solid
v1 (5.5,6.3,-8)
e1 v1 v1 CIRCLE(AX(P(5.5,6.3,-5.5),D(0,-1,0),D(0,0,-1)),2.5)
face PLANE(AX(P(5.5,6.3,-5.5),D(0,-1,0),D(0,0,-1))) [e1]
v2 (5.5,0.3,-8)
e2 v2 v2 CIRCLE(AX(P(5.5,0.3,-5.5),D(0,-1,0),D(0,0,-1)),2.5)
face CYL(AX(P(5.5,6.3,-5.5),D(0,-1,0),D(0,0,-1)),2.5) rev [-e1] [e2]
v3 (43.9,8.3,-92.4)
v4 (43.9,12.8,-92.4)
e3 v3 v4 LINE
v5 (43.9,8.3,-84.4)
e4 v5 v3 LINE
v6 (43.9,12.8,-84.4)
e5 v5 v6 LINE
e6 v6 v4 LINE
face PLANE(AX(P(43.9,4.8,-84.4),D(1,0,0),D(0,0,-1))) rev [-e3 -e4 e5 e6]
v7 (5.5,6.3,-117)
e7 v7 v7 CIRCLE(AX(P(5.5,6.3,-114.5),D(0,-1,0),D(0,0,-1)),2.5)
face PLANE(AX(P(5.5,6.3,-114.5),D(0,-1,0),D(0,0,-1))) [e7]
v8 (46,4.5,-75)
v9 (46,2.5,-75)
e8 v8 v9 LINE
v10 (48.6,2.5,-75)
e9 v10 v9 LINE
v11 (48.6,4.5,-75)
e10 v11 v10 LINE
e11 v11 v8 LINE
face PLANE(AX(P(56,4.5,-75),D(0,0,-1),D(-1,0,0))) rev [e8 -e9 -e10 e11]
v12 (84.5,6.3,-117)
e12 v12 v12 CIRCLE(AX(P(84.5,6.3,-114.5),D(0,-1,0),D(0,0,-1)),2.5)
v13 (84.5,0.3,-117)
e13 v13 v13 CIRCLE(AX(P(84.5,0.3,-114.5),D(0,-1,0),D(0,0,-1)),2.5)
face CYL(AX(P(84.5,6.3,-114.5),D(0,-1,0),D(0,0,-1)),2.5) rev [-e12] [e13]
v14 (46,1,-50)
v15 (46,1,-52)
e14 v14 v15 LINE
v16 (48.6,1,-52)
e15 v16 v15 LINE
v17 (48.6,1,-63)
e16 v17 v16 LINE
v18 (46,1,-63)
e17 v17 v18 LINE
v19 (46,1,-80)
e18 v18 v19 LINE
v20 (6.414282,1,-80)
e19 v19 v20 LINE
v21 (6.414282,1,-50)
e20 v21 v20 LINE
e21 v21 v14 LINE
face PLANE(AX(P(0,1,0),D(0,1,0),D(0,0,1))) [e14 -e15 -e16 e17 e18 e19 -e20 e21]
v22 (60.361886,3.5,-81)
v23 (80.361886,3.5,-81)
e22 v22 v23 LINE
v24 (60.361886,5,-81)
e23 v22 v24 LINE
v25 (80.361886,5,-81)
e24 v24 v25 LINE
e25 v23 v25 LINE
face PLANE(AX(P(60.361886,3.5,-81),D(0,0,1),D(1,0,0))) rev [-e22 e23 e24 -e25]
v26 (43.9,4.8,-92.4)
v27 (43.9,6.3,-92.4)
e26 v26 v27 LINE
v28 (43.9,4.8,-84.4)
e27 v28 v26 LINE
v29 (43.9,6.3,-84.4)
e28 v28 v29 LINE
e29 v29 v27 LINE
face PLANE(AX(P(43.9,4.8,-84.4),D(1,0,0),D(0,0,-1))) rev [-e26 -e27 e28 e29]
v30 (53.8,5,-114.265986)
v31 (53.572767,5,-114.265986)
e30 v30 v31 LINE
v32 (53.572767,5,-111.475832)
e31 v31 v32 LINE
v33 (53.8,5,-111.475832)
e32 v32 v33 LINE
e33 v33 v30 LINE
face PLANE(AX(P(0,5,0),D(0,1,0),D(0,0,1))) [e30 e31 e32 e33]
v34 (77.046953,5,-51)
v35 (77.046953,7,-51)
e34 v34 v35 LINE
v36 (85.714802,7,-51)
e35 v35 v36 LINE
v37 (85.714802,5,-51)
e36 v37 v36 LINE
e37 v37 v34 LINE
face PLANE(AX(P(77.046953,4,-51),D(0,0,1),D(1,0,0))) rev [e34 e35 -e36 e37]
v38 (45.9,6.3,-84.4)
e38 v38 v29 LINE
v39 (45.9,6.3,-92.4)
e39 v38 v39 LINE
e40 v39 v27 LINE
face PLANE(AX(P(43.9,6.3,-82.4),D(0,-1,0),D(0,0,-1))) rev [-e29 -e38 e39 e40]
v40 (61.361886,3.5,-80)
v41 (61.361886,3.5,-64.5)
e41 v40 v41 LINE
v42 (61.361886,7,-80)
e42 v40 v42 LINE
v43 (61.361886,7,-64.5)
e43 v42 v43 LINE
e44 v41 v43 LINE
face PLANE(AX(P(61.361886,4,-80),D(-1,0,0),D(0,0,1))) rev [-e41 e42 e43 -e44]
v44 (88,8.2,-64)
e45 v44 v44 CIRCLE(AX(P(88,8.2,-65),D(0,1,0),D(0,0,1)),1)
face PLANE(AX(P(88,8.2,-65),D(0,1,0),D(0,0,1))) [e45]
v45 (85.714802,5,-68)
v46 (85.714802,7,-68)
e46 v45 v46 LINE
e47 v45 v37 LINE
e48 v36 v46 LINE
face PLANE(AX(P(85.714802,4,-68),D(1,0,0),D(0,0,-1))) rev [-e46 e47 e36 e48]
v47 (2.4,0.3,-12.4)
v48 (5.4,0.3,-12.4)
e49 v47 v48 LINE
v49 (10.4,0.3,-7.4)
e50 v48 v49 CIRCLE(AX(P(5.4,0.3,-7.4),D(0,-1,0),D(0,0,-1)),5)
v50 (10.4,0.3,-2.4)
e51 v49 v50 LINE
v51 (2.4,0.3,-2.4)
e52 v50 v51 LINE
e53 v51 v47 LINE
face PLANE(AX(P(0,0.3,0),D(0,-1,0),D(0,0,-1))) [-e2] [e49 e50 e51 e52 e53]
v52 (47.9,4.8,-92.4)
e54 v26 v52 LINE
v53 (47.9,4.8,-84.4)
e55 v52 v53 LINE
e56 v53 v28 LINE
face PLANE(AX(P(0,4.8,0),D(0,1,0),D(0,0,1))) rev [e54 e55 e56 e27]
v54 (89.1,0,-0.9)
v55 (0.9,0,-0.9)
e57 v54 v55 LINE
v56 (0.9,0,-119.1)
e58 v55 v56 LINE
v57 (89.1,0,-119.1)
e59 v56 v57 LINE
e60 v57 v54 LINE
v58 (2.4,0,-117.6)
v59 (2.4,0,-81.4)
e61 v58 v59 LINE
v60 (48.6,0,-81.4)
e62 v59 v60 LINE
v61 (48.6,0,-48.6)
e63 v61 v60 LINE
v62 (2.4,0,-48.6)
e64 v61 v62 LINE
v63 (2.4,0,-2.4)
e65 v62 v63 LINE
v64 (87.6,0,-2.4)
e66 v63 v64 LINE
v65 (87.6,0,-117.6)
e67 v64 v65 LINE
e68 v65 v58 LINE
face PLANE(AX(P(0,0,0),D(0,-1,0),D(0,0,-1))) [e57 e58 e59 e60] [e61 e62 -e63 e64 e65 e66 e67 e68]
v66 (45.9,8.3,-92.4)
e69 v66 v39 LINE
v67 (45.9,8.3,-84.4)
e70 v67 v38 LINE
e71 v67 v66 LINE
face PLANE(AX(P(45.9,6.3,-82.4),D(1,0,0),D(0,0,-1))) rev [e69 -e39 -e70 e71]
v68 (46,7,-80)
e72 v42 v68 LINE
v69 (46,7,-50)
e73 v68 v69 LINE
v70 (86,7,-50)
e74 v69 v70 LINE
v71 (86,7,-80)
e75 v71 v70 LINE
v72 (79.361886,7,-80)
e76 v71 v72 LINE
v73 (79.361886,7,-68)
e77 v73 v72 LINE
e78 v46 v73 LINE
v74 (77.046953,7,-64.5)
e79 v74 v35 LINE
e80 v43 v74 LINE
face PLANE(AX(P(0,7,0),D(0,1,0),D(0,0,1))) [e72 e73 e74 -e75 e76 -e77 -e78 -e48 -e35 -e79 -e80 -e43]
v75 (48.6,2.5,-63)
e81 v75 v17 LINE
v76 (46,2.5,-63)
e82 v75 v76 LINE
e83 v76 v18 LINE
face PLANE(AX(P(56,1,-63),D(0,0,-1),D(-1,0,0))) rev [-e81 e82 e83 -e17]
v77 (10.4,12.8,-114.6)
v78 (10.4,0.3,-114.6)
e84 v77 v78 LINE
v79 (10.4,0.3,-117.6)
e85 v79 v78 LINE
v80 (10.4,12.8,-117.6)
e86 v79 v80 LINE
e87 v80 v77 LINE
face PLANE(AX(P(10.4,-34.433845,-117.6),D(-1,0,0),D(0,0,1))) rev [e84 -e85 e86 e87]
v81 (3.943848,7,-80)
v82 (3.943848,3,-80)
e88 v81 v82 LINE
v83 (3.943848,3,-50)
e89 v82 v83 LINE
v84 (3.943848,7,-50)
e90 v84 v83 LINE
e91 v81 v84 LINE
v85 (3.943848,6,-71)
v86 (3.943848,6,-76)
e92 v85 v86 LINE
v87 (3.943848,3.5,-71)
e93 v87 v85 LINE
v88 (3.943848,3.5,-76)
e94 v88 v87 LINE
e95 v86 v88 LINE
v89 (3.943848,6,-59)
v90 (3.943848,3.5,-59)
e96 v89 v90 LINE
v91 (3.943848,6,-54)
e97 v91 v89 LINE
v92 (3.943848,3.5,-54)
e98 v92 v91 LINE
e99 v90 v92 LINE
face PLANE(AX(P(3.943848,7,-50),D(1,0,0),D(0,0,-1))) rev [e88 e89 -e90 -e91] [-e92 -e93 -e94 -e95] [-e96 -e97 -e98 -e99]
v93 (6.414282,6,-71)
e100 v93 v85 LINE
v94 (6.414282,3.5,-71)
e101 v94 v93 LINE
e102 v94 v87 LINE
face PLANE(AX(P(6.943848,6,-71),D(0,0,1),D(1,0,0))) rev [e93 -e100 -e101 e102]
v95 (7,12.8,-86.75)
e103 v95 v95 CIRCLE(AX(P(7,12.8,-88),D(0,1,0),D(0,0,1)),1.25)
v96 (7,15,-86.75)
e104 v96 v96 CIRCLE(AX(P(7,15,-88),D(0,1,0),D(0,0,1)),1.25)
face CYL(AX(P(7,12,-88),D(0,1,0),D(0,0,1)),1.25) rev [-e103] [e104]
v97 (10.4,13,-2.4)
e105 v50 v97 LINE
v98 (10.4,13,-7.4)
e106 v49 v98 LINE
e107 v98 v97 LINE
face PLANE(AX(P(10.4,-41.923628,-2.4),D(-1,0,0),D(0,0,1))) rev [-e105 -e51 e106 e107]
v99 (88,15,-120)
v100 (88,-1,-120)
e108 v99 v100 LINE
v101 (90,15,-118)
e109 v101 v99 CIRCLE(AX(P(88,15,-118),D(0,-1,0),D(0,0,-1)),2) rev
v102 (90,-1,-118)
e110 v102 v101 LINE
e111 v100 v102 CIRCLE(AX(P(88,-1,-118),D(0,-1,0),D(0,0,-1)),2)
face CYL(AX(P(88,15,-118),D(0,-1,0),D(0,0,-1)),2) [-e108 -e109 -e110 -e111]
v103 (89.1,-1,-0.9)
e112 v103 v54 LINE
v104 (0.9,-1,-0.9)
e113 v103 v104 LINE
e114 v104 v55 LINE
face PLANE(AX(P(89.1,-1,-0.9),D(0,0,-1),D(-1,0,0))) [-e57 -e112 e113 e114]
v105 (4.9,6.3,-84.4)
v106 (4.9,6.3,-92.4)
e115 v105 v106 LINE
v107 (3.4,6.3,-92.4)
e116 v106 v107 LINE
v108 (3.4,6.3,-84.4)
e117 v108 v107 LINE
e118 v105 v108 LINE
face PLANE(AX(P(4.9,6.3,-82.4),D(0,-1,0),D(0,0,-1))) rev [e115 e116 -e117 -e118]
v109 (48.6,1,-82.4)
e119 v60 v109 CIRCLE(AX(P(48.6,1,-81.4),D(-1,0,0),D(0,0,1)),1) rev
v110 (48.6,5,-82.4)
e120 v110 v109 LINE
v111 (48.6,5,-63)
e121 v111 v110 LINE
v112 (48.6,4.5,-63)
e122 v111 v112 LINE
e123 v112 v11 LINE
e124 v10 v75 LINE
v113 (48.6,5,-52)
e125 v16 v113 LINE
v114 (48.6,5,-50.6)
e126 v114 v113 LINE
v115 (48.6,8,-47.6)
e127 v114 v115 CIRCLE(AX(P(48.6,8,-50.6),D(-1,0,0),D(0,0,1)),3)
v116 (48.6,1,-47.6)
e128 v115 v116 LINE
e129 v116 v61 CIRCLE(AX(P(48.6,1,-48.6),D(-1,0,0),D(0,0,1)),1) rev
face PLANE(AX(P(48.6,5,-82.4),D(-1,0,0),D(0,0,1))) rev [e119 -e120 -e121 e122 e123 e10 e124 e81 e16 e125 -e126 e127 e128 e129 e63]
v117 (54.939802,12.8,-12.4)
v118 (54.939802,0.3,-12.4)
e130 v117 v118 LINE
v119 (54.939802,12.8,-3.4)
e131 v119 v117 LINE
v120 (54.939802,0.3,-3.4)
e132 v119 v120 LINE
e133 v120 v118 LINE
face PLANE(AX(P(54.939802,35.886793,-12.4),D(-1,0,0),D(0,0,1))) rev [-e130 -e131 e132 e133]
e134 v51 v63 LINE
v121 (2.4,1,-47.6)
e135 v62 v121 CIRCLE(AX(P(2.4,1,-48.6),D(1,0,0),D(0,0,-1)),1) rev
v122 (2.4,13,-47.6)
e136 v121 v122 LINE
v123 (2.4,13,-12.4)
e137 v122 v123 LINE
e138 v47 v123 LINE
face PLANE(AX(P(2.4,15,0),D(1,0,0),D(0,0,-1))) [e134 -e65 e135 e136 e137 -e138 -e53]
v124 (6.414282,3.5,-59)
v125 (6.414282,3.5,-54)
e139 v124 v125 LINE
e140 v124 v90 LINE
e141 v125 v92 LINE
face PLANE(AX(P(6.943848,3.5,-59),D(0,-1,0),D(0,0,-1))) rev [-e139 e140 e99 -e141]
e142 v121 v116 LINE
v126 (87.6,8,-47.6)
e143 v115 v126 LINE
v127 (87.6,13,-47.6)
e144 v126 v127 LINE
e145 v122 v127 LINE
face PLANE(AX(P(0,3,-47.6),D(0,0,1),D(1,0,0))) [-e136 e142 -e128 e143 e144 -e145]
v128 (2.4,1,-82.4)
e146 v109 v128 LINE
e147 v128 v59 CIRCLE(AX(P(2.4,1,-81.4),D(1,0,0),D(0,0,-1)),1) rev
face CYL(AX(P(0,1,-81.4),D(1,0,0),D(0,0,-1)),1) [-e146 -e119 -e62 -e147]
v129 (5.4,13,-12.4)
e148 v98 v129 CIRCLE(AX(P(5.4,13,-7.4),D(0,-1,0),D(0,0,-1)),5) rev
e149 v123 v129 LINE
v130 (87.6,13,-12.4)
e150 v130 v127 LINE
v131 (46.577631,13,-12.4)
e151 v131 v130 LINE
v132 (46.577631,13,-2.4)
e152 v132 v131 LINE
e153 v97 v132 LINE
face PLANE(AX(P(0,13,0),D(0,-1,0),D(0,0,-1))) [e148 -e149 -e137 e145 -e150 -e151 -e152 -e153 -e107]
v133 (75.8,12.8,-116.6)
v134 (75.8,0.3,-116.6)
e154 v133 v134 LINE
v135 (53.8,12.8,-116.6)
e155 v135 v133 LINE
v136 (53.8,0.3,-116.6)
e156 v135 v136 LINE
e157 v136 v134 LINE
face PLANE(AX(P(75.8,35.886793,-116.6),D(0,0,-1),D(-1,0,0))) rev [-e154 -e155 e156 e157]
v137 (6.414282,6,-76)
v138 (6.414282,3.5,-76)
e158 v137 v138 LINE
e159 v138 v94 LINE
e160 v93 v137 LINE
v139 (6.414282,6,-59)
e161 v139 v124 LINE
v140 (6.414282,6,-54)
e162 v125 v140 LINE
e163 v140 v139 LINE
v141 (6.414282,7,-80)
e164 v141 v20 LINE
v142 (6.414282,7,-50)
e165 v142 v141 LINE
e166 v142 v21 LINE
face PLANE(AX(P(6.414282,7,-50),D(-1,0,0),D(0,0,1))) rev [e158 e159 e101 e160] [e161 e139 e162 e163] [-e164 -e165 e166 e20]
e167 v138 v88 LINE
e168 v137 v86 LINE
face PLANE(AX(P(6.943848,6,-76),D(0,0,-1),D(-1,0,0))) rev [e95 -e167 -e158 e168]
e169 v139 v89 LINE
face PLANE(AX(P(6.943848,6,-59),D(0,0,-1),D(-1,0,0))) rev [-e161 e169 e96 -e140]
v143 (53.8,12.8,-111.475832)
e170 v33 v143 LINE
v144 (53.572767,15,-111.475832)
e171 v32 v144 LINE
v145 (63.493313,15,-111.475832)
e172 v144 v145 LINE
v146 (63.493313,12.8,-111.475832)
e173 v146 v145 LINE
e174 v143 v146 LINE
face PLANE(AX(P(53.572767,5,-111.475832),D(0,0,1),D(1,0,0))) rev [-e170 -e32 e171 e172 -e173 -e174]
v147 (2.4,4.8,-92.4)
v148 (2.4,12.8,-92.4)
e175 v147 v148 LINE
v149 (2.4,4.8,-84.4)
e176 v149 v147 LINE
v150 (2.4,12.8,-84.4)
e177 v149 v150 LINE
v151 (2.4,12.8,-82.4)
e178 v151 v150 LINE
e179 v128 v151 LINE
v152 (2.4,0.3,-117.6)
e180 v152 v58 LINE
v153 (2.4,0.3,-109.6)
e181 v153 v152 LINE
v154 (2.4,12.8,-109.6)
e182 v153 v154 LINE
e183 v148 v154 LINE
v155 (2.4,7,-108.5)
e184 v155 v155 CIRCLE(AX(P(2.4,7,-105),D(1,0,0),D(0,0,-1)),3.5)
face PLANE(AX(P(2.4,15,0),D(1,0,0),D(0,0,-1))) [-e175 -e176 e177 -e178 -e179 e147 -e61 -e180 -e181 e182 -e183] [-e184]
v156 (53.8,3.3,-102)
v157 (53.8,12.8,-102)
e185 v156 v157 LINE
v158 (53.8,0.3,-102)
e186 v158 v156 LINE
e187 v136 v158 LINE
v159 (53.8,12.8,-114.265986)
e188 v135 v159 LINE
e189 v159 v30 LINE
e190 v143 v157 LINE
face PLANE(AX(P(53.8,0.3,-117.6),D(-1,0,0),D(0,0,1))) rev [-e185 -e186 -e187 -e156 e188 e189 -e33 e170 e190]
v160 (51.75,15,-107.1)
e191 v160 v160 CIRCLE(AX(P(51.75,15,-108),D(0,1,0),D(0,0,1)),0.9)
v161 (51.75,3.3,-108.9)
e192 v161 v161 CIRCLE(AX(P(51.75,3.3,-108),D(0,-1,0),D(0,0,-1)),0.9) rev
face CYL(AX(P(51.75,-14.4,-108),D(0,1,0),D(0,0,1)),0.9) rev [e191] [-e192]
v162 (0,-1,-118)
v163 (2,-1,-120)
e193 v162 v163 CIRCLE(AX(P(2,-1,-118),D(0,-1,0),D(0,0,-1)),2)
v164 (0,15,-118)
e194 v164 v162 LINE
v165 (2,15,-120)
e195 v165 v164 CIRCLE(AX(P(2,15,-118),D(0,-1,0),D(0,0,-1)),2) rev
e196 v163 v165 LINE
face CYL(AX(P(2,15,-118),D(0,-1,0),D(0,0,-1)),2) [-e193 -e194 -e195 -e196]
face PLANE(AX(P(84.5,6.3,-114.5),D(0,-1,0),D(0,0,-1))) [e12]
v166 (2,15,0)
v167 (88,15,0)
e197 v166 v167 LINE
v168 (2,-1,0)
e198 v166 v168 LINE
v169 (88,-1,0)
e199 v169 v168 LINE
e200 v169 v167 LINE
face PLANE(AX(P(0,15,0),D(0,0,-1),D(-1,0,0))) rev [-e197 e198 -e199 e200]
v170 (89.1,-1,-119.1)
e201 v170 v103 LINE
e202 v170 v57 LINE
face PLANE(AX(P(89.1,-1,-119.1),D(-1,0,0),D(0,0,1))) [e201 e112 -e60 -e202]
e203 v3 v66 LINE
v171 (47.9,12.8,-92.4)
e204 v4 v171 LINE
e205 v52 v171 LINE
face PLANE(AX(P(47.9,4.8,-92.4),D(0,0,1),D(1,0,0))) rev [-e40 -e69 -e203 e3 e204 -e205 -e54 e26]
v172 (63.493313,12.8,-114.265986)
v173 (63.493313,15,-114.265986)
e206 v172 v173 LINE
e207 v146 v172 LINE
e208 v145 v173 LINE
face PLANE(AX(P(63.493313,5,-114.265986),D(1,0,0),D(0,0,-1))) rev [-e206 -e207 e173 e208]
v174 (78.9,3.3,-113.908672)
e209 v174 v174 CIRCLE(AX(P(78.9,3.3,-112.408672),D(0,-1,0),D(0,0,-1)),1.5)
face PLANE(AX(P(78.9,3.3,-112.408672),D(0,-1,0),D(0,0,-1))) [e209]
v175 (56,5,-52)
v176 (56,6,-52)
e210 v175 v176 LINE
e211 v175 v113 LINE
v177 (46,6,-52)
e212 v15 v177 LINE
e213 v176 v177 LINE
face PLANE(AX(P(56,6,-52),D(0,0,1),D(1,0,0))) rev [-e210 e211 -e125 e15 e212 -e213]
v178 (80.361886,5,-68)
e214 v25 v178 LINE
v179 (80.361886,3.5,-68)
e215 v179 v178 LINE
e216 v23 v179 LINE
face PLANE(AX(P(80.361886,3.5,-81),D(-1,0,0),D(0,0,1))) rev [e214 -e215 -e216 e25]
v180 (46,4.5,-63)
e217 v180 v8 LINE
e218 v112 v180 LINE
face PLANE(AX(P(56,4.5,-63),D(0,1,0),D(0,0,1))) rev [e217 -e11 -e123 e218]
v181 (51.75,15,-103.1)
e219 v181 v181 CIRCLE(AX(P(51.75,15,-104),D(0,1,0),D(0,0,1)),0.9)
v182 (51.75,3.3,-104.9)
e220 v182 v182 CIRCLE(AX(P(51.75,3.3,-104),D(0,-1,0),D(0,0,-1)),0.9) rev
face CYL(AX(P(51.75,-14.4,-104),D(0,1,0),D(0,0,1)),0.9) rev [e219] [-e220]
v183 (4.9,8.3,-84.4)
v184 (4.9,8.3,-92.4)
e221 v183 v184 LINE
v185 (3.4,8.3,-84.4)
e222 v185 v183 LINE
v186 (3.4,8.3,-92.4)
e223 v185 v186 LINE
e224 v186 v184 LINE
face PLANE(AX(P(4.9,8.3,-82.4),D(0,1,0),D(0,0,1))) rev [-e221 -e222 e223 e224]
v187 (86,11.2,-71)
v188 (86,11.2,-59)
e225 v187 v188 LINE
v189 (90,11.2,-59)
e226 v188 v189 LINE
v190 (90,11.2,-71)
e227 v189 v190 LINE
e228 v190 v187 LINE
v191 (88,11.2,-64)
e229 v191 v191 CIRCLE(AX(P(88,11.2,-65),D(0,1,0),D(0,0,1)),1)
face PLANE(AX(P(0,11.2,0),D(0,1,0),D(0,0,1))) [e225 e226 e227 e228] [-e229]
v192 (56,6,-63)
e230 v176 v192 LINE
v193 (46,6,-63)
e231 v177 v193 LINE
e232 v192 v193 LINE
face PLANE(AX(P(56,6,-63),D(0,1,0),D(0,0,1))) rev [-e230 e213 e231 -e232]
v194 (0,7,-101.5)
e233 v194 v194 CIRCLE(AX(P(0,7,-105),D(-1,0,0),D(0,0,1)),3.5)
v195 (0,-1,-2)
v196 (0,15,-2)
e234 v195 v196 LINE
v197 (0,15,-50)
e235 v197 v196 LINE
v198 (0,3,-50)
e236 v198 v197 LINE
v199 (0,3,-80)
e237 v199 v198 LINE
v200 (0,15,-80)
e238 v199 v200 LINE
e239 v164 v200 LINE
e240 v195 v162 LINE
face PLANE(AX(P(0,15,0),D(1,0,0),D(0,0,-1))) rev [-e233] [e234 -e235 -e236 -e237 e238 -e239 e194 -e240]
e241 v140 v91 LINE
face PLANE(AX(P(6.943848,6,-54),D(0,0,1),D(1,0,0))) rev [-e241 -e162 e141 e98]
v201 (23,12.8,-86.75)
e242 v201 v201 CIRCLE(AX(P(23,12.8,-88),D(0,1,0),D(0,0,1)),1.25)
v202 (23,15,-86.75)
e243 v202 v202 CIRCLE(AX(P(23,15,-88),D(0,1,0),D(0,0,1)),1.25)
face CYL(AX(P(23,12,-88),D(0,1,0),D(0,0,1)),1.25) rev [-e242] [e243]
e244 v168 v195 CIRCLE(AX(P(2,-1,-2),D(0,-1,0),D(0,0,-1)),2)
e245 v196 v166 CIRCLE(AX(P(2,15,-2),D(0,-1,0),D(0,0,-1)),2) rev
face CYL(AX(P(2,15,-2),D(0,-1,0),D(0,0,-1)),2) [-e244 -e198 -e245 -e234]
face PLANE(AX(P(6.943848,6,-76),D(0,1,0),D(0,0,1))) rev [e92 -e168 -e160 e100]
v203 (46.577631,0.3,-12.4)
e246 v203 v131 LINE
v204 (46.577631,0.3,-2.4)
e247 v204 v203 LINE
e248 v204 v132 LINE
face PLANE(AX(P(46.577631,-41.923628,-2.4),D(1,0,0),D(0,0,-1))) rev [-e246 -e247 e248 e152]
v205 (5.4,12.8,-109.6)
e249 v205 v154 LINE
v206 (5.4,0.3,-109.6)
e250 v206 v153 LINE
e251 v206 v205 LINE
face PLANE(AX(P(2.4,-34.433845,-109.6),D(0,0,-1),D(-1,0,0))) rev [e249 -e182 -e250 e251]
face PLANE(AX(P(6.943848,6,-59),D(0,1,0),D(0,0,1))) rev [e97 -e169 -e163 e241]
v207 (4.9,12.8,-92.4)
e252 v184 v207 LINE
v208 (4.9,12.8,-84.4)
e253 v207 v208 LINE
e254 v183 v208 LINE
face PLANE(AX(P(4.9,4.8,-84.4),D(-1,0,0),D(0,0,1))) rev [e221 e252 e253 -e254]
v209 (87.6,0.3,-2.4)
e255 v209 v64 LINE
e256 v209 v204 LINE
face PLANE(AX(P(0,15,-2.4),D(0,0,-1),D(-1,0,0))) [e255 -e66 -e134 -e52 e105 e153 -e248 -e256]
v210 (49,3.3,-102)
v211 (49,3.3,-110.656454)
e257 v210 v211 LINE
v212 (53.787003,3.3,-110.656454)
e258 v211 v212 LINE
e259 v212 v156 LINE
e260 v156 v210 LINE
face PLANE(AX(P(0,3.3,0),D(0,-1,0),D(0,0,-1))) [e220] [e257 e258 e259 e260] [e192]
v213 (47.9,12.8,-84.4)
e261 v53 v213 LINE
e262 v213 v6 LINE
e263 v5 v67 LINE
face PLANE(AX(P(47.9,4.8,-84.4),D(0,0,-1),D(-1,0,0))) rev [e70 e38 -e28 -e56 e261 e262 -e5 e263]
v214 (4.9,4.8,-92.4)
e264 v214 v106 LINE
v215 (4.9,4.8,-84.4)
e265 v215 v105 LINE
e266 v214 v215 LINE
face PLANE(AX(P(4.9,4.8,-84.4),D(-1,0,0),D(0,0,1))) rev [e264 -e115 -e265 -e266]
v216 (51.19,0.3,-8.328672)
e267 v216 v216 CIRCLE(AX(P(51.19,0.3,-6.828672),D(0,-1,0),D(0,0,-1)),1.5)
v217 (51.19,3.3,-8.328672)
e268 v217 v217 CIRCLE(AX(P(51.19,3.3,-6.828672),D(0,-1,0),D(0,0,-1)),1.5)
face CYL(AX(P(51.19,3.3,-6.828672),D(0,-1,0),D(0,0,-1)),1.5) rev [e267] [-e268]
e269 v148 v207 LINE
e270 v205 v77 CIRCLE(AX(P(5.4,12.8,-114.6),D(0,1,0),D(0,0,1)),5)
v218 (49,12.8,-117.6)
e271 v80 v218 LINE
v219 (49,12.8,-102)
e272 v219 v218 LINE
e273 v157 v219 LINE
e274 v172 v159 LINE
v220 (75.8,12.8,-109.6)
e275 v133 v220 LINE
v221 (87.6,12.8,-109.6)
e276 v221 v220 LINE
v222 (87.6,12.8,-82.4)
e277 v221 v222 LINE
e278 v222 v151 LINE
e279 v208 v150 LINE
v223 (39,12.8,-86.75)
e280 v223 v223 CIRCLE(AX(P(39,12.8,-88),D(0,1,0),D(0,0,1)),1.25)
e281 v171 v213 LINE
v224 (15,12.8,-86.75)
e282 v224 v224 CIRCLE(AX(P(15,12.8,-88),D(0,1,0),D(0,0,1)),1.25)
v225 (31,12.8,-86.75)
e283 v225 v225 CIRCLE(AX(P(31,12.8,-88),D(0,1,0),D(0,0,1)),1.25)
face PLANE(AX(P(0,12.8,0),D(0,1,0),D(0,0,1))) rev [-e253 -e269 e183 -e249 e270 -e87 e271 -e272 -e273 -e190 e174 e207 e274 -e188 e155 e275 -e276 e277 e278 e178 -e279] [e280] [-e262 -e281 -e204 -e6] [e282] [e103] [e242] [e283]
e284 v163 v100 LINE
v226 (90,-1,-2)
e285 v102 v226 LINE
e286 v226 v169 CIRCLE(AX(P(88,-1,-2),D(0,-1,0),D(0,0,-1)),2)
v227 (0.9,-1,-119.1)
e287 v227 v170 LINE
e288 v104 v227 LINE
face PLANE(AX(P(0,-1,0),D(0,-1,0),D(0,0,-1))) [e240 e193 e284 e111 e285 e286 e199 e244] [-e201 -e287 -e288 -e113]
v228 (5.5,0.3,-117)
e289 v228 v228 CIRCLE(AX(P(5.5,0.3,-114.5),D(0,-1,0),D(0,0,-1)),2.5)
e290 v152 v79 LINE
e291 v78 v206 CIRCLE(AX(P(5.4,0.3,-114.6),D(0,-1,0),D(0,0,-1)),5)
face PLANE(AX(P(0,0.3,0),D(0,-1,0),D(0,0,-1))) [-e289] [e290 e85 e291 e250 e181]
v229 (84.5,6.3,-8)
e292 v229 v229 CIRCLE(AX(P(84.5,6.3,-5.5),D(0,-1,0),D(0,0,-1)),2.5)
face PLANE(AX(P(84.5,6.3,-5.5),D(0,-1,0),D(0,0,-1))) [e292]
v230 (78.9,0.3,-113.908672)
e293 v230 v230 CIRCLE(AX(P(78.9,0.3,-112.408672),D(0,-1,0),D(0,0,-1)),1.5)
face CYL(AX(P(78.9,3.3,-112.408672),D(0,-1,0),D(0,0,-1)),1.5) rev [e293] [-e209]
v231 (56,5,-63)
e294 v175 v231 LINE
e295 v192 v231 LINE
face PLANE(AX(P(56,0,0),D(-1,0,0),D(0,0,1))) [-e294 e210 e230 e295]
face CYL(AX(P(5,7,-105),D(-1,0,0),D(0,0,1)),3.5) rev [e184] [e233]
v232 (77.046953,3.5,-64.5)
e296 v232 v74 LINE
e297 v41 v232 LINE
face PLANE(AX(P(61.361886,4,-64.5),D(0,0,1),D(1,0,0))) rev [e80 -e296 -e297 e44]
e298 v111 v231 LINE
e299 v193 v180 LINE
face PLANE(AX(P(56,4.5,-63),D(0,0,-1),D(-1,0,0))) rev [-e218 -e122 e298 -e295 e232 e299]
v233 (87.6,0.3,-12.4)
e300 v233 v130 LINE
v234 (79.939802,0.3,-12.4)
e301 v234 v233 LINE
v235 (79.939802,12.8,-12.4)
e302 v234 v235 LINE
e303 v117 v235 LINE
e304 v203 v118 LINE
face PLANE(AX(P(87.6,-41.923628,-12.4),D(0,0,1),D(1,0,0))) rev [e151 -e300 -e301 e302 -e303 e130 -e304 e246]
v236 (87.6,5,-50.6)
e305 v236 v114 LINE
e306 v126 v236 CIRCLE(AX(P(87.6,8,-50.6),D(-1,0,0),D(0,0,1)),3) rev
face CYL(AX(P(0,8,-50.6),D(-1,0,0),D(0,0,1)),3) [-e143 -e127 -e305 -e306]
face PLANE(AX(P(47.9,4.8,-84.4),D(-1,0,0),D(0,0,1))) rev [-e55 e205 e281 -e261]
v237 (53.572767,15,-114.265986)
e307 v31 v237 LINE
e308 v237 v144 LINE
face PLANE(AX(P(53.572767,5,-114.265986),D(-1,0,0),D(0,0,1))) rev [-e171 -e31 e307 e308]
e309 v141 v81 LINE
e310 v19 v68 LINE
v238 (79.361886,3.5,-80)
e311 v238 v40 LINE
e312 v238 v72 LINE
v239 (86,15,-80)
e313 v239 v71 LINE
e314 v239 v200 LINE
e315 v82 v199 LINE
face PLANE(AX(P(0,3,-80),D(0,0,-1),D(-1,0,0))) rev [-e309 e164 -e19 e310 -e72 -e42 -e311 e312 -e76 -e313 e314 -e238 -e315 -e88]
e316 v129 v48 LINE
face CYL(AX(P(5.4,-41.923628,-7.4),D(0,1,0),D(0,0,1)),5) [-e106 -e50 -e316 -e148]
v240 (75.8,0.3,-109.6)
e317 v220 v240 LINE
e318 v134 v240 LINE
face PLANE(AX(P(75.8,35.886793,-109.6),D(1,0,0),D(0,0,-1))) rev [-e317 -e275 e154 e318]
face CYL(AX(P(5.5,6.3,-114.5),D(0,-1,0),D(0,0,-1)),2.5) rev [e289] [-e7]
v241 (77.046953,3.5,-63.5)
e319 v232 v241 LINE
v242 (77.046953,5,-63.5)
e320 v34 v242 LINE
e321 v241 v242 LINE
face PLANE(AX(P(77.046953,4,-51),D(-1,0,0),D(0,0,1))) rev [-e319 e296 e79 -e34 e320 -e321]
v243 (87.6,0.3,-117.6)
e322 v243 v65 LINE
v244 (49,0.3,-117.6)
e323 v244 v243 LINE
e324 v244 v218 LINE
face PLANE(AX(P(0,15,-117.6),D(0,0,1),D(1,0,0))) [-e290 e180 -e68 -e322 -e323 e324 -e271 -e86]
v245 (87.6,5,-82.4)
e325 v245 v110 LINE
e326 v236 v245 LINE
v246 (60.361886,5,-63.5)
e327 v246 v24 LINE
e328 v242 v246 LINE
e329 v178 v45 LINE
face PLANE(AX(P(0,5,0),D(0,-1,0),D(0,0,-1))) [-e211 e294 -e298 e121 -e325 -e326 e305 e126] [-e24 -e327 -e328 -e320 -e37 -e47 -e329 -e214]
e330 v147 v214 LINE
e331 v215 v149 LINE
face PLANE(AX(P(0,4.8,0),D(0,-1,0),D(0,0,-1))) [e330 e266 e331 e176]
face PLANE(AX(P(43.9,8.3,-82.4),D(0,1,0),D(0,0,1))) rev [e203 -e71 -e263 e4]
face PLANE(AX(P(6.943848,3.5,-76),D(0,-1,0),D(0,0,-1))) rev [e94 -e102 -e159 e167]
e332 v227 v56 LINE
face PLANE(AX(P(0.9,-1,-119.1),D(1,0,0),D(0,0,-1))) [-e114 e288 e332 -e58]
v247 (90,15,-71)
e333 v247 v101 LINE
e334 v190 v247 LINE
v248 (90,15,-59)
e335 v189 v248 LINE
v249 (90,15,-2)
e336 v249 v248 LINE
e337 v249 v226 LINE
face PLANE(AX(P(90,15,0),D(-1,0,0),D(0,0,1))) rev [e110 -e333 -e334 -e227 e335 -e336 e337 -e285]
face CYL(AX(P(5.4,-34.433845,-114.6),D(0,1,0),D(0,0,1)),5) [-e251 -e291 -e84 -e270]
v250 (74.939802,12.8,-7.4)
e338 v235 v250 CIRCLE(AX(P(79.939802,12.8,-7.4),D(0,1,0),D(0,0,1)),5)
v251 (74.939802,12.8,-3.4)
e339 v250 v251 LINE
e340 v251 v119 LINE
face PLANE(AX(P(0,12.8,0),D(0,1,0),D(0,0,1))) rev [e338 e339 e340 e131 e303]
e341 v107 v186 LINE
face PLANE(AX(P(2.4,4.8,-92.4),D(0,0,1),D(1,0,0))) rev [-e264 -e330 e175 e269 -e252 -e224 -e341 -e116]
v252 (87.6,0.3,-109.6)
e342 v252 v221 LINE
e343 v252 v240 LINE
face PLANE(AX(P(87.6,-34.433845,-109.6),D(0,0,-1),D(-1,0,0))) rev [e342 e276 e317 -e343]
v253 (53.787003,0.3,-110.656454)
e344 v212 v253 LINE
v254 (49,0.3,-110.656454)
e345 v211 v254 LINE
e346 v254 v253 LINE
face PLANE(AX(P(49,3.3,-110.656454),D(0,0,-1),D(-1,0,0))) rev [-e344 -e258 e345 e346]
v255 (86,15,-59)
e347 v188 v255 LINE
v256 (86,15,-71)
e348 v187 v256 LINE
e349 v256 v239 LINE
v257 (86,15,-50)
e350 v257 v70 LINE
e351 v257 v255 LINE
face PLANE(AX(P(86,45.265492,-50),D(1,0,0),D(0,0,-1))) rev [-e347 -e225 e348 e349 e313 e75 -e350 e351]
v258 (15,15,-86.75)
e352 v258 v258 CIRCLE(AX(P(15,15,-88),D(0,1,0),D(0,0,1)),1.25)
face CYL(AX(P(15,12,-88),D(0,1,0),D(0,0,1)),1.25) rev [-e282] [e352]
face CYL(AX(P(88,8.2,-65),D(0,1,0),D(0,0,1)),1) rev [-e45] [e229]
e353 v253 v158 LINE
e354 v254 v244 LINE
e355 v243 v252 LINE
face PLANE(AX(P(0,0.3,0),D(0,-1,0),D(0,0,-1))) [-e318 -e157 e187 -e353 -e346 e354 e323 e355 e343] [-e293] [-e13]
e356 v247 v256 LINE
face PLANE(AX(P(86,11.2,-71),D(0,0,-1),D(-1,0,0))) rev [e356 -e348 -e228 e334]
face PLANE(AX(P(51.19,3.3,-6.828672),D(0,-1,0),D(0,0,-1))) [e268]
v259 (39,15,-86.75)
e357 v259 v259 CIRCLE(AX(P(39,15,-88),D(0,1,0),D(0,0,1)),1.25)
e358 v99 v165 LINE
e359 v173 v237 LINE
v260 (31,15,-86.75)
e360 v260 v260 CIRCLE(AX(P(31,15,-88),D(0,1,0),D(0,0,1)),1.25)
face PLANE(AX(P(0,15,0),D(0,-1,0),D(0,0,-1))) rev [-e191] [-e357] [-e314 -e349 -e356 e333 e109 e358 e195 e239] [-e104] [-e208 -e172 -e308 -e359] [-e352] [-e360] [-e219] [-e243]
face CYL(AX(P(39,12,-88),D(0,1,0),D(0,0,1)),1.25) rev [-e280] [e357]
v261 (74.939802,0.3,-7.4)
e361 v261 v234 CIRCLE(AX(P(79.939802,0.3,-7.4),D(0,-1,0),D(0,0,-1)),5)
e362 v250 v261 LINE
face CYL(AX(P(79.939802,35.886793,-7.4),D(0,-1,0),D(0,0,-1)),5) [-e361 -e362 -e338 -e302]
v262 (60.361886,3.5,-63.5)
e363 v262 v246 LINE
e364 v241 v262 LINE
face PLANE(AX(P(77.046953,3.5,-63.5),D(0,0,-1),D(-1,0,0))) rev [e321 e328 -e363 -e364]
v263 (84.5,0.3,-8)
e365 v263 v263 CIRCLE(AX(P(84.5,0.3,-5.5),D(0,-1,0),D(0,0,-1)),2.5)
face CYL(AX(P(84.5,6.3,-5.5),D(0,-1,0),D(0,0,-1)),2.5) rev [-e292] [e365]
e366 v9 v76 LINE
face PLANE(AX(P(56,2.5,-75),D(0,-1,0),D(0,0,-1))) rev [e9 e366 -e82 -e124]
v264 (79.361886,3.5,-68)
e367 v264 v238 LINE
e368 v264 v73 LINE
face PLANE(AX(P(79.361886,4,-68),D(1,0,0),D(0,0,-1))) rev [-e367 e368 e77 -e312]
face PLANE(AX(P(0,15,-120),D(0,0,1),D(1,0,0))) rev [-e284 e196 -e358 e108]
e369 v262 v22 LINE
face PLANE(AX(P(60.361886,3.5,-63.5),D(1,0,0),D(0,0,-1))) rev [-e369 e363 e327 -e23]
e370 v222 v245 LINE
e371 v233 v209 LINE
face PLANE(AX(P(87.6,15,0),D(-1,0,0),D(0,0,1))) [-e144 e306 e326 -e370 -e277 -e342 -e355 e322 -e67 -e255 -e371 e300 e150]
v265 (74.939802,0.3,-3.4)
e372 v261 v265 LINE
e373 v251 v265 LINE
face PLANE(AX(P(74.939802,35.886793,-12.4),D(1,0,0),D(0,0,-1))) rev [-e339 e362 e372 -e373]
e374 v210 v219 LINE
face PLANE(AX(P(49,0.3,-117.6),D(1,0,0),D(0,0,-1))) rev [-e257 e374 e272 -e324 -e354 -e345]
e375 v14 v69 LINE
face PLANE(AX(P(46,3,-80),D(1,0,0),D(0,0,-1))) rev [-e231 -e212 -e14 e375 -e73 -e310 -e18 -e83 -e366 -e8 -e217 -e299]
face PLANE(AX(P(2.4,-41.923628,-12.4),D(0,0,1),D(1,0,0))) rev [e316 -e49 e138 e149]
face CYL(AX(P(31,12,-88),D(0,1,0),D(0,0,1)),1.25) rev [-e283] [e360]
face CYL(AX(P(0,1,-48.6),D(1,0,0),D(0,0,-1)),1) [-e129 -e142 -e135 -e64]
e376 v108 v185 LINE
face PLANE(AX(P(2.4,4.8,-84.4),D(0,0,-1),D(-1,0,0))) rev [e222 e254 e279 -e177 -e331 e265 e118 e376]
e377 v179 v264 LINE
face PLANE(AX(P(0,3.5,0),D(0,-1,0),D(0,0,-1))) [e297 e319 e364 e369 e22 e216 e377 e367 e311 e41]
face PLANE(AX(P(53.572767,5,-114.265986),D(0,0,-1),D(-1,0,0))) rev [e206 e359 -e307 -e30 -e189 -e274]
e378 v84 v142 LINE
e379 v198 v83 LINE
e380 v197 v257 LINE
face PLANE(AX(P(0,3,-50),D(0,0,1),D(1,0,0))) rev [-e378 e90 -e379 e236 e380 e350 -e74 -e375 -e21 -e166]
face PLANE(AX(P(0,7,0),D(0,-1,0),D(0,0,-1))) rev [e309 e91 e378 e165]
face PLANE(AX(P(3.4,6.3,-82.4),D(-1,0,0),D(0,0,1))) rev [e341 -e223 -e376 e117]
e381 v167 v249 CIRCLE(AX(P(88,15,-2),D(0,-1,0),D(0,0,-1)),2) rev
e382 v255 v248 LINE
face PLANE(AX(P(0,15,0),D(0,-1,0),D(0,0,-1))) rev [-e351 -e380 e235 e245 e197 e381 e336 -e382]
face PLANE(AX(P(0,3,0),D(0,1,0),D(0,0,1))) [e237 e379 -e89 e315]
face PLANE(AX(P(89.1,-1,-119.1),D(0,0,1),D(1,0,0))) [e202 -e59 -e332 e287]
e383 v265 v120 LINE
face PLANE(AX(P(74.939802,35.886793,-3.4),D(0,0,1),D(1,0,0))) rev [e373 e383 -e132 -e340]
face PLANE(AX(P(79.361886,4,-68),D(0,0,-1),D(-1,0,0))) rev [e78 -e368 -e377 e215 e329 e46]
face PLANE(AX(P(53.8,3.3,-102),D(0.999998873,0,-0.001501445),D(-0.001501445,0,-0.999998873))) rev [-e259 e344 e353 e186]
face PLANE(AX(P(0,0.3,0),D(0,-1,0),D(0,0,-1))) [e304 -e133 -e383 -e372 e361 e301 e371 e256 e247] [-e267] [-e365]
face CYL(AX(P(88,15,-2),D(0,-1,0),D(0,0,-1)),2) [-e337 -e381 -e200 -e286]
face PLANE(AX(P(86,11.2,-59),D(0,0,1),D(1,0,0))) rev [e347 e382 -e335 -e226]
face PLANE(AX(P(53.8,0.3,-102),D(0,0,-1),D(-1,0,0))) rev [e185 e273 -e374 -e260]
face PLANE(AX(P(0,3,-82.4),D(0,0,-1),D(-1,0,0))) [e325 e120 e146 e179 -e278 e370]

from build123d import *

# Parameters (mm, degrees)
SKETCH1_W            = 90
SKETCH1_H            = 120
BOSS_EXTRUDE1_DEPTH  = 15
SKETCH2_W            = 46
SKETCH2_H            = 30
CUT_EXTRUDE1_DEPTH   = 12
SKETCH3_W            = 44
SKETCH3_H            = 30
CUT_EXTRUDE2_DEPTH   = 8
SHELL1_START         = -47.6
SHELL1_OUTLINE_W     = 85.2
SHELL1_OUTLINE_H     = 13
SHELL1_DEPTH         = 45.2
SHELL1_START_2       = -117.6
SHELL1_2_OUTLINE_W   = 85.2
SHELL1_2_OUTLINE_H   = 5
SHELL1_2_DEPTH       = 35.2
SKETCH7_W            = 39
SKETCH7_H            = 34.8
CUT_EXTRUDE6_DEPTH   = 5
SKETCH11_W           = 42.056152249
SKETCH11_H           = 30
CUT_EXTRUDE9_DEPTH   = 2
CUT_EXTRUDE7_DEPTH   = 10
CUT_EXTRUDE10_DEPTH  = 3
SKETCH14_W           = 90
SKETCH14_H           = 120
SKETCH14_W_2         = 88.2
SKETCH14_H_2         = 118.2
BOSS_EXTRUDE2_DEPTH  = 1
SKETCH22_W           = 4
SKETCH22_H           = 30
BOSS_EXTRUDE6_DEPTH  = 8
SKETCH26_W           = 4
SKETCH26_H           = 12
CUT_EXTRUDE20_DEPTH  = 3.8
SKETCH27_R           = 1
CUT_EXTRUDE21_DEPTH  = 3
BOSS_EXTRUDE9_DEPTH  = 1.5
SKETCH40_R           = 3.5
CUT_EXTRUDE24_DEPTH  = 5
FILLET1_R            = 3
SKETCH44_W           = 85.2
SKETCH44_H           = 35.2
CUT_EXTRUDE25_DEPTH  = 7.8
SKETCH46_W           = 4.8
SKETCH46_H           = 15.6
BOSS_EXTRUDE15_DEPTH = 12.5
SKETCH6_R            = 0.9
CUT_EXTRUDE26_DEPTH  = 29.4
SKETCH47_W           = 33.8
SKETCH47_H           = 8
SKETCH47_W_2         = 8
BOSS_EXTRUDE16_DEPTH = 12.5
SKETCH49_W           = 41.022368698
SKETCH49_H           = 10
SKETCH49_W_2         = 8
BOSS_EXTRUDE17_DEPTH = 12.7
SKETCH50_W           = 22
SKETCH50_H           = 7
SKETCH50_W_2         = 20
SKETCH50_H_2         = 9
CUT_EXTRUDE28_DEPTH  = 12.5
FILLET3_R            = 5
FILLET4_R            = 2
SKETCH51_R           = 2.5
CUT_EXTRUDE29_DEPTH  = 6
CUT_EXTRUDE30_DEPTH  = 3
SKETCH52_R           = 1.5
CUT_EXTRUDE31_DEPTH  = 3
SKETCH54_W           = 2.470433815
SKETCH54_H           = 30
BOSS_EXTRUDE18_DEPTH = 6
SKETCH55_W           = 5
SKETCH55_H           = 2.5
CUT_EXTRUDE32_DEPTH  = 3
FILLET5_R            = 1
SKETCH56_R           = 1.25
CUT_EXTRUDE33_DEPTH  = 3
SKETCH57_W           = 2.5
SKETCH57_H           = 8
SKETCH57_W_2         = 4
BOSS_EXTRUDE19_DEPTH = 8
SKETCH58_W           = 1.5
SKETCH58_H           = 2
SKETCH58_W_2         = 2
CUT_EXTRUDE34_DEPTH  = 10
SKETCH59_W           = 9.920545957
SKETCH59_H           = 2.790153551
CUT_EXTRUDE35_DEPTH  = 10


# Read off the part's stored shape, not the designer's step: Shell1
with BuildPart() as part:
    # Sketch1 → Boss-Extrude1 (new body)
    with BuildSketch(Plane(origin=(0, 0, 0), x_dir=(1, 0, 0), z_dir=(0, 1, 0))):
        with Locations((45, 60)):
            Rectangle(SKETCH1_W, SKETCH1_H)
    extrude(amount=BOSS_EXTRUDE1_DEPTH)

    # Sketch2 → Cut-Extrude1 (cut)
    with BuildSketch(Plane(origin=(0, 15, 0), x_dir=(1, 0, 0), z_dir=(0, 1, 0))):
        with Locations((23, 65)):
            Rectangle(SKETCH2_W, SKETCH2_H)
    extrude(amount=-CUT_EXTRUDE1_DEPTH, mode=Mode.SUBTRACT)

    # Sketch3 → Cut-Extrude2 (cut)
    with BuildSketch(Plane(origin=(0, 15, 0), x_dir=(1, 0, 0), z_dir=(0, 1, 0))):
        with Locations((68, 65)):
            Rectangle(SKETCH3_W, SKETCH3_H)
    extrude(amount=-CUT_EXTRUDE2_DEPTH, mode=Mode.SUBTRACT)

    # Shell1 outline → Shell1 (cut)
    with BuildSketch(Plane.XY.offset(SHELL1_START)):
        with Locations((45, 6.5)):
            Rectangle(SHELL1_OUTLINE_W, SHELL1_OUTLINE_H)
    extrude(amount=SHELL1_DEPTH, mode=Mode.SUBTRACT)

    # Shell1 2 outline → Shell1 2 (cut)
    with BuildSketch(Plane.XY.offset(SHELL1_START_2)):
        with Locations((45, 2.5)):
            Rectangle(SHELL1_2_OUTLINE_W, SHELL1_2_OUTLINE_H)
    extrude(amount=SHELL1_2_DEPTH, mode=Mode.SUBTRACT)

    # Sketch7 → Cut-Extrude6 (cut)
    with BuildSketch(Plane.XZ):
        with Locations((68.1, -65)):
            Rectangle(SKETCH7_W, SKETCH7_H)
    extrude(amount=-CUT_EXTRUDE6_DEPTH, mode=Mode.SUBTRACT)

    # Sketch11 → Cut-Extrude9 (cut)
    with BuildSketch(Plane(origin=(0, 3, 0), x_dir=(1, 0, 0), z_dir=(0, 1, 0))):
        with Locations((24.971923875, 65)):
            Rectangle(SKETCH11_W, SKETCH11_H)
    extrude(amount=-CUT_EXTRUDE9_DEPTH, mode=Mode.SUBTRACT)

    # Sketch8 → Cut-Extrude7 (cut)
    with BuildSketch(Plane.ZY.offset(-46)):
        Polygon((-63, 1), (-63, 2.5), (-75, 2.5), (-75, 4.5), (-63, 4.5), (-63, 6), (-52, 6), (-52, 4.5), (-52, 1), align=None)
    extrude(amount=-CUT_EXTRUDE7_DEPTH, mode=Mode.SUBTRACT)

    # Sketch12 → Cut-Extrude10 (cut)
    with BuildSketch(Plane(origin=(0, 7, 0), x_dir=(1, 0, 0), z_dir=(0, 1, 0))):
        Polygon((79.361885724, 68), (79.361885724, 80), (61.361885724, 80), (61.361885724, 64.5), (77.04695331, 64.5), (77.04695331, 51), (85.714801791, 51), (85.714801791, 68), align=None)
    extrude(amount=-CUT_EXTRUDE10_DEPTH, mode=Mode.SUBTRACT)

    # Sketch14 → Boss-Extrude2 (add)
    with BuildSketch(Plane.XZ):
        with Locations((45, -60)):
            Rectangle(SKETCH14_W, SKETCH14_H)
        with Locations((45, -60)):
            Rectangle(SKETCH14_W_2, SKETCH14_H_2, mode=Mode.SUBTRACT)
    extrude(amount=BOSS_EXTRUDE2_DEPTH)

    # Sketch22 → Boss-Extrude6 (add)
    with BuildSketch(Plane(origin=(0, 7, 0), x_dir=(1, 0, 0), z_dir=(0, 1, 0))):
        with Locations((88, 65)):
            Rectangle(SKETCH22_W, SKETCH22_H)
    extrude(amount=BOSS_EXTRUDE6_DEPTH)

    # Sketch26 → Cut-Extrude20 (cut)
    with BuildSketch(Plane(origin=(0, 15, 0), x_dir=(1, 0, 0), z_dir=(0, 1, 0))):
        with Locations((88, 65)):
            Rectangle(SKETCH26_W, SKETCH26_H)
    extrude(amount=-CUT_EXTRUDE20_DEPTH, mode=Mode.SUBTRACT)

    # Sketch27 → Cut-Extrude21 (cut)
    with BuildSketch(Plane(origin=(0, 11.2, 0), x_dir=(1, 0, 0), z_dir=(0, 1, 0))):
        with Locations(Location((88, 65, 0), (0, 0, 270))):
            Circle(SKETCH27_R)
    extrude(amount=-CUT_EXTRUDE21_DEPTH, mode=Mode.SUBTRACT)

    # Sketch36 → Boss-Extrude9 (add)
    with BuildSketch(Plane.XZ.offset(-5)):
        Polygon((77.04695331, -63.5), (60.361885724, -63.5), (60.361885724, -81), (80.361885724, -81), (80.361885724, -68), (79.361885724, -68), (79.361885724, -80), (61.361885724, -80), (61.361885724, -64.5), (77.04695331, -64.5), align=None)
    extrude(amount=BOSS_EXTRUDE9_DEPTH)

    # Sketch40 → Cut-Extrude24 (cut)
    with BuildSketch(Plane.ZY):
        with Locations((-105, 7)):
            Circle(SKETCH40_R)
    extrude(amount=-CUT_EXTRUDE24_DEPTH, mode=Mode.SUBTRACT)

    # Fillet1
    fillet1_edges = [part.edges().sort_by_distance(p)[0] for p in [
        (68.1, 5, -47.6),
    ]]
    fillet(fillet1_edges, radius=FILLET1_R)

    # Sketch44 → Cut-Extrude25 (cut)
    with BuildSketch(Plane.XZ.offset(-5)):
        with Locations((45, -100)):
            Rectangle(SKETCH44_W, SKETCH44_H)
    extrude(amount=-CUT_EXTRUDE25_DEPTH, mode=Mode.SUBTRACT)

    # Sketch46 → Boss-Extrude15 (add)
    with BuildSketch(Plane.XZ.offset(-12.8)):
        with Locations((51.4, -109.8)):
            Rectangle(SKETCH46_W, SKETCH46_H)
    extrude(amount=BOSS_EXTRUDE15_DEPTH)

    # Sketch6 → Cut-Extrude26 (cut)
    with BuildSketch(Plane(origin=(0, 15, 0), x_dir=(1, 0, 0), z_dir=(0, 1, 0))):
        with Locations(Location((51.75, 108, 0), (0, 0, 270))):
            Circle(SKETCH6_R)
        with Locations(Location((51.75, 104, 0), (0, 0, 270))):
            Circle(SKETCH6_R)
    extrude(amount=-CUT_EXTRUDE26_DEPTH, mode=Mode.SUBTRACT)

    # Sketch47 → Boss-Extrude16 (add)
    with BuildSketch(Plane.XZ.offset(-12.8)):
        with Locations((70.7, -113.6)):
            Rectangle(SKETCH47_W, SKETCH47_H)
        with Locations((6.4, -113.6)):
            Rectangle(SKETCH47_W_2, SKETCH47_H)
    extrude(amount=BOSS_EXTRUDE16_DEPTH)

    # Sketch49 → Boss-Extrude17 (add)
    with BuildSketch(Plane.XZ.offset(-13)):
        with Locations((67.088815651, -7.4)):
            Rectangle(SKETCH49_W, SKETCH49_H)
        with Locations((6.4, -7.4)):
            Rectangle(SKETCH49_W_2, SKETCH49_H)
    extrude(amount=BOSS_EXTRUDE17_DEPTH)

    # Sketch50 → Cut-Extrude28 (cut)
    with BuildSketch(Plane.XZ.offset(-0.3)):
        with Locations((64.8, -113.1)):
            Rectangle(SKETCH50_W, SKETCH50_H)
        with Locations((64.939802008, -7.9)):
            Rectangle(SKETCH50_W_2, SKETCH50_H_2)
    extrude(amount=-CUT_EXTRUDE28_DEPTH, mode=Mode.SUBTRACT)

    # Fillet3
    fillet3_edges = [part.edges().sort_by_distance(p)[0] for p in [
        (10.4, 6.55, -109.6),
        (10.4, 6.65, -12.4),
        (74.939802008, 6.55, -12.4),
    ]]
    fillet(fillet3_edges, radius=FILLET3_R)

    # Fillet4
    fillet4_edges = [part.edges().sort_by_distance(p)[0] for p in [
        (0, 7, -120),
        (90, 7, -120),
        (90, 7, 0),
        (0, 7, 0),
    ]]
    fillet(fillet4_edges, radius=FILLET4_R)

    # Sketch51 → Cut-Extrude29 (cut)
    with BuildSketch(Plane.XZ.offset(-0.3)):
        with Locations(Location((84.5, -114.5, 0), (0, 0, 270))):
            Circle(SKETCH51_R)
        with Locations(Location((84.5, -5.5, 0), (0, 0, 270))):
            Circle(SKETCH51_R)
        with Locations(Location((5.5, -5.5, 0), (0, 0, 270))):
            Circle(SKETCH51_R)
        with Locations(Location((5.5, -114.5, 0), (0, 0, 270))):
            Circle(SKETCH51_R)
    extrude(amount=-CUT_EXTRUDE29_DEPTH, mode=Mode.SUBTRACT)

    # Sketch53 → Cut-Extrude30 (cut)
    with BuildSketch(Plane.XZ.offset(-0.3)):
        Polygon((53.8, -102), (49, -102), (49, -110.656453849), (53.787002796, -110.656453849), align=None)
    extrude(amount=-CUT_EXTRUDE30_DEPTH, mode=Mode.SUBTRACT)

    # Sketch52 → Cut-Extrude31 (cut)
    with BuildSketch(Plane.XZ.offset(-0.3)):
        with Locations(Location((51.19, -6.828671793, 0), (0, 0, 270))):
            Circle(SKETCH52_R)
        with Locations(Location((78.9, -112.408671793, 0), (0, 0, 270))):
            Circle(SKETCH52_R)
    extrude(amount=-CUT_EXTRUDE31_DEPTH, mode=Mode.SUBTRACT)

    # Sketch54 → Boss-Extrude18 (add)
    with BuildSketch(Plane(origin=(0, 1, 0), x_dir=(1, 0, 0), z_dir=(0, 1, 0))):
        with Locations((5.179064659, 65)):
            Rectangle(SKETCH54_W, SKETCH54_H)
    extrude(amount=BOSS_EXTRUDE18_DEPTH)

    # Sketch55 → Cut-Extrude32 (cut)
    with BuildSketch(Plane.ZY.offset(-3.943847751)):
        with Locations((-73.5, 4.75)):
            Rectangle(SKETCH55_W, SKETCH55_H)
        with Locations((-56.5, 4.75)):
            Rectangle(SKETCH55_W, SKETCH55_H)
    extrude(amount=-CUT_EXTRUDE32_DEPTH, mode=Mode.SUBTRACT)

    # Fillet5
    fillet5_edges = [part.edges().sort_by_distance(p)[0] for p in [
        (25.5, 0, -82.4),
        (25.5, 0, -47.6),
    ]]
    fillet(fillet5_edges, radius=FILLET5_R)

    # Sketch56 → Cut-Extrude33 (cut)
    with BuildSketch(Plane(origin=(0, 15, 0), x_dir=(1, 0, 0), z_dir=(0, 1, 0))):
        with Locations(Location((7, 88, 0), (0, 0, 270))):
            Circle(SKETCH56_R)
        with Locations(Location((15, 88, 0), (0, 0, 270))):
            Circle(SKETCH56_R)
        with Locations(Location((23, 88, 0), (0, 0, 270))):
            Circle(SKETCH56_R)
        with Locations(Location((31, 88, 0), (0, 0, 270))):
            Circle(SKETCH56_R)
        with Locations(Location((39, 88, 0), (0, 0, 270))):
            Circle(SKETCH56_R)
    extrude(amount=-CUT_EXTRUDE33_DEPTH, mode=Mode.SUBTRACT)

    # Sketch57 → Boss-Extrude19 (add)
    with BuildSketch(Plane.XZ.offset(-12.8)):
        with Locations((3.65, -88.4)):
            Rectangle(SKETCH57_W, SKETCH57_H)
        with Locations((45.9, -88.4)):
            Rectangle(SKETCH57_W_2, SKETCH57_H)
    extrude(amount=BOSS_EXTRUDE19_DEPTH)

    # Sketch58 → Cut-Extrude34 (cut)
    with BuildSketch(Plane(origin=(0, 0, -92.4), x_dir=(-1, 0, 0), z_dir=(0, 0, -1))):
        with Locations((-4.15, 7.3)):
            Rectangle(SKETCH58_W, SKETCH58_H)
        with Locations((-44.9, 7.3)):
            Rectangle(SKETCH58_W_2, SKETCH58_H)
    extrude(amount=-CUT_EXTRUDE34_DEPTH, mode=Mode.SUBTRACT)

    # Sketch59 → Cut-Extrude35 (cut)
    with BuildSketch(Plane(origin=(0, 15, 0), x_dir=(1, 0, 0), z_dir=(0, 1, 0))):
        with Locations((58.533039989, 112.870908725)):
            Rectangle(SKETCH59_W, SKETCH59_H)
    extrude(amount=-CUT_EXTRUDE35_DEPTH, mode=Mode.SUBTRACT)


solid = part.part
